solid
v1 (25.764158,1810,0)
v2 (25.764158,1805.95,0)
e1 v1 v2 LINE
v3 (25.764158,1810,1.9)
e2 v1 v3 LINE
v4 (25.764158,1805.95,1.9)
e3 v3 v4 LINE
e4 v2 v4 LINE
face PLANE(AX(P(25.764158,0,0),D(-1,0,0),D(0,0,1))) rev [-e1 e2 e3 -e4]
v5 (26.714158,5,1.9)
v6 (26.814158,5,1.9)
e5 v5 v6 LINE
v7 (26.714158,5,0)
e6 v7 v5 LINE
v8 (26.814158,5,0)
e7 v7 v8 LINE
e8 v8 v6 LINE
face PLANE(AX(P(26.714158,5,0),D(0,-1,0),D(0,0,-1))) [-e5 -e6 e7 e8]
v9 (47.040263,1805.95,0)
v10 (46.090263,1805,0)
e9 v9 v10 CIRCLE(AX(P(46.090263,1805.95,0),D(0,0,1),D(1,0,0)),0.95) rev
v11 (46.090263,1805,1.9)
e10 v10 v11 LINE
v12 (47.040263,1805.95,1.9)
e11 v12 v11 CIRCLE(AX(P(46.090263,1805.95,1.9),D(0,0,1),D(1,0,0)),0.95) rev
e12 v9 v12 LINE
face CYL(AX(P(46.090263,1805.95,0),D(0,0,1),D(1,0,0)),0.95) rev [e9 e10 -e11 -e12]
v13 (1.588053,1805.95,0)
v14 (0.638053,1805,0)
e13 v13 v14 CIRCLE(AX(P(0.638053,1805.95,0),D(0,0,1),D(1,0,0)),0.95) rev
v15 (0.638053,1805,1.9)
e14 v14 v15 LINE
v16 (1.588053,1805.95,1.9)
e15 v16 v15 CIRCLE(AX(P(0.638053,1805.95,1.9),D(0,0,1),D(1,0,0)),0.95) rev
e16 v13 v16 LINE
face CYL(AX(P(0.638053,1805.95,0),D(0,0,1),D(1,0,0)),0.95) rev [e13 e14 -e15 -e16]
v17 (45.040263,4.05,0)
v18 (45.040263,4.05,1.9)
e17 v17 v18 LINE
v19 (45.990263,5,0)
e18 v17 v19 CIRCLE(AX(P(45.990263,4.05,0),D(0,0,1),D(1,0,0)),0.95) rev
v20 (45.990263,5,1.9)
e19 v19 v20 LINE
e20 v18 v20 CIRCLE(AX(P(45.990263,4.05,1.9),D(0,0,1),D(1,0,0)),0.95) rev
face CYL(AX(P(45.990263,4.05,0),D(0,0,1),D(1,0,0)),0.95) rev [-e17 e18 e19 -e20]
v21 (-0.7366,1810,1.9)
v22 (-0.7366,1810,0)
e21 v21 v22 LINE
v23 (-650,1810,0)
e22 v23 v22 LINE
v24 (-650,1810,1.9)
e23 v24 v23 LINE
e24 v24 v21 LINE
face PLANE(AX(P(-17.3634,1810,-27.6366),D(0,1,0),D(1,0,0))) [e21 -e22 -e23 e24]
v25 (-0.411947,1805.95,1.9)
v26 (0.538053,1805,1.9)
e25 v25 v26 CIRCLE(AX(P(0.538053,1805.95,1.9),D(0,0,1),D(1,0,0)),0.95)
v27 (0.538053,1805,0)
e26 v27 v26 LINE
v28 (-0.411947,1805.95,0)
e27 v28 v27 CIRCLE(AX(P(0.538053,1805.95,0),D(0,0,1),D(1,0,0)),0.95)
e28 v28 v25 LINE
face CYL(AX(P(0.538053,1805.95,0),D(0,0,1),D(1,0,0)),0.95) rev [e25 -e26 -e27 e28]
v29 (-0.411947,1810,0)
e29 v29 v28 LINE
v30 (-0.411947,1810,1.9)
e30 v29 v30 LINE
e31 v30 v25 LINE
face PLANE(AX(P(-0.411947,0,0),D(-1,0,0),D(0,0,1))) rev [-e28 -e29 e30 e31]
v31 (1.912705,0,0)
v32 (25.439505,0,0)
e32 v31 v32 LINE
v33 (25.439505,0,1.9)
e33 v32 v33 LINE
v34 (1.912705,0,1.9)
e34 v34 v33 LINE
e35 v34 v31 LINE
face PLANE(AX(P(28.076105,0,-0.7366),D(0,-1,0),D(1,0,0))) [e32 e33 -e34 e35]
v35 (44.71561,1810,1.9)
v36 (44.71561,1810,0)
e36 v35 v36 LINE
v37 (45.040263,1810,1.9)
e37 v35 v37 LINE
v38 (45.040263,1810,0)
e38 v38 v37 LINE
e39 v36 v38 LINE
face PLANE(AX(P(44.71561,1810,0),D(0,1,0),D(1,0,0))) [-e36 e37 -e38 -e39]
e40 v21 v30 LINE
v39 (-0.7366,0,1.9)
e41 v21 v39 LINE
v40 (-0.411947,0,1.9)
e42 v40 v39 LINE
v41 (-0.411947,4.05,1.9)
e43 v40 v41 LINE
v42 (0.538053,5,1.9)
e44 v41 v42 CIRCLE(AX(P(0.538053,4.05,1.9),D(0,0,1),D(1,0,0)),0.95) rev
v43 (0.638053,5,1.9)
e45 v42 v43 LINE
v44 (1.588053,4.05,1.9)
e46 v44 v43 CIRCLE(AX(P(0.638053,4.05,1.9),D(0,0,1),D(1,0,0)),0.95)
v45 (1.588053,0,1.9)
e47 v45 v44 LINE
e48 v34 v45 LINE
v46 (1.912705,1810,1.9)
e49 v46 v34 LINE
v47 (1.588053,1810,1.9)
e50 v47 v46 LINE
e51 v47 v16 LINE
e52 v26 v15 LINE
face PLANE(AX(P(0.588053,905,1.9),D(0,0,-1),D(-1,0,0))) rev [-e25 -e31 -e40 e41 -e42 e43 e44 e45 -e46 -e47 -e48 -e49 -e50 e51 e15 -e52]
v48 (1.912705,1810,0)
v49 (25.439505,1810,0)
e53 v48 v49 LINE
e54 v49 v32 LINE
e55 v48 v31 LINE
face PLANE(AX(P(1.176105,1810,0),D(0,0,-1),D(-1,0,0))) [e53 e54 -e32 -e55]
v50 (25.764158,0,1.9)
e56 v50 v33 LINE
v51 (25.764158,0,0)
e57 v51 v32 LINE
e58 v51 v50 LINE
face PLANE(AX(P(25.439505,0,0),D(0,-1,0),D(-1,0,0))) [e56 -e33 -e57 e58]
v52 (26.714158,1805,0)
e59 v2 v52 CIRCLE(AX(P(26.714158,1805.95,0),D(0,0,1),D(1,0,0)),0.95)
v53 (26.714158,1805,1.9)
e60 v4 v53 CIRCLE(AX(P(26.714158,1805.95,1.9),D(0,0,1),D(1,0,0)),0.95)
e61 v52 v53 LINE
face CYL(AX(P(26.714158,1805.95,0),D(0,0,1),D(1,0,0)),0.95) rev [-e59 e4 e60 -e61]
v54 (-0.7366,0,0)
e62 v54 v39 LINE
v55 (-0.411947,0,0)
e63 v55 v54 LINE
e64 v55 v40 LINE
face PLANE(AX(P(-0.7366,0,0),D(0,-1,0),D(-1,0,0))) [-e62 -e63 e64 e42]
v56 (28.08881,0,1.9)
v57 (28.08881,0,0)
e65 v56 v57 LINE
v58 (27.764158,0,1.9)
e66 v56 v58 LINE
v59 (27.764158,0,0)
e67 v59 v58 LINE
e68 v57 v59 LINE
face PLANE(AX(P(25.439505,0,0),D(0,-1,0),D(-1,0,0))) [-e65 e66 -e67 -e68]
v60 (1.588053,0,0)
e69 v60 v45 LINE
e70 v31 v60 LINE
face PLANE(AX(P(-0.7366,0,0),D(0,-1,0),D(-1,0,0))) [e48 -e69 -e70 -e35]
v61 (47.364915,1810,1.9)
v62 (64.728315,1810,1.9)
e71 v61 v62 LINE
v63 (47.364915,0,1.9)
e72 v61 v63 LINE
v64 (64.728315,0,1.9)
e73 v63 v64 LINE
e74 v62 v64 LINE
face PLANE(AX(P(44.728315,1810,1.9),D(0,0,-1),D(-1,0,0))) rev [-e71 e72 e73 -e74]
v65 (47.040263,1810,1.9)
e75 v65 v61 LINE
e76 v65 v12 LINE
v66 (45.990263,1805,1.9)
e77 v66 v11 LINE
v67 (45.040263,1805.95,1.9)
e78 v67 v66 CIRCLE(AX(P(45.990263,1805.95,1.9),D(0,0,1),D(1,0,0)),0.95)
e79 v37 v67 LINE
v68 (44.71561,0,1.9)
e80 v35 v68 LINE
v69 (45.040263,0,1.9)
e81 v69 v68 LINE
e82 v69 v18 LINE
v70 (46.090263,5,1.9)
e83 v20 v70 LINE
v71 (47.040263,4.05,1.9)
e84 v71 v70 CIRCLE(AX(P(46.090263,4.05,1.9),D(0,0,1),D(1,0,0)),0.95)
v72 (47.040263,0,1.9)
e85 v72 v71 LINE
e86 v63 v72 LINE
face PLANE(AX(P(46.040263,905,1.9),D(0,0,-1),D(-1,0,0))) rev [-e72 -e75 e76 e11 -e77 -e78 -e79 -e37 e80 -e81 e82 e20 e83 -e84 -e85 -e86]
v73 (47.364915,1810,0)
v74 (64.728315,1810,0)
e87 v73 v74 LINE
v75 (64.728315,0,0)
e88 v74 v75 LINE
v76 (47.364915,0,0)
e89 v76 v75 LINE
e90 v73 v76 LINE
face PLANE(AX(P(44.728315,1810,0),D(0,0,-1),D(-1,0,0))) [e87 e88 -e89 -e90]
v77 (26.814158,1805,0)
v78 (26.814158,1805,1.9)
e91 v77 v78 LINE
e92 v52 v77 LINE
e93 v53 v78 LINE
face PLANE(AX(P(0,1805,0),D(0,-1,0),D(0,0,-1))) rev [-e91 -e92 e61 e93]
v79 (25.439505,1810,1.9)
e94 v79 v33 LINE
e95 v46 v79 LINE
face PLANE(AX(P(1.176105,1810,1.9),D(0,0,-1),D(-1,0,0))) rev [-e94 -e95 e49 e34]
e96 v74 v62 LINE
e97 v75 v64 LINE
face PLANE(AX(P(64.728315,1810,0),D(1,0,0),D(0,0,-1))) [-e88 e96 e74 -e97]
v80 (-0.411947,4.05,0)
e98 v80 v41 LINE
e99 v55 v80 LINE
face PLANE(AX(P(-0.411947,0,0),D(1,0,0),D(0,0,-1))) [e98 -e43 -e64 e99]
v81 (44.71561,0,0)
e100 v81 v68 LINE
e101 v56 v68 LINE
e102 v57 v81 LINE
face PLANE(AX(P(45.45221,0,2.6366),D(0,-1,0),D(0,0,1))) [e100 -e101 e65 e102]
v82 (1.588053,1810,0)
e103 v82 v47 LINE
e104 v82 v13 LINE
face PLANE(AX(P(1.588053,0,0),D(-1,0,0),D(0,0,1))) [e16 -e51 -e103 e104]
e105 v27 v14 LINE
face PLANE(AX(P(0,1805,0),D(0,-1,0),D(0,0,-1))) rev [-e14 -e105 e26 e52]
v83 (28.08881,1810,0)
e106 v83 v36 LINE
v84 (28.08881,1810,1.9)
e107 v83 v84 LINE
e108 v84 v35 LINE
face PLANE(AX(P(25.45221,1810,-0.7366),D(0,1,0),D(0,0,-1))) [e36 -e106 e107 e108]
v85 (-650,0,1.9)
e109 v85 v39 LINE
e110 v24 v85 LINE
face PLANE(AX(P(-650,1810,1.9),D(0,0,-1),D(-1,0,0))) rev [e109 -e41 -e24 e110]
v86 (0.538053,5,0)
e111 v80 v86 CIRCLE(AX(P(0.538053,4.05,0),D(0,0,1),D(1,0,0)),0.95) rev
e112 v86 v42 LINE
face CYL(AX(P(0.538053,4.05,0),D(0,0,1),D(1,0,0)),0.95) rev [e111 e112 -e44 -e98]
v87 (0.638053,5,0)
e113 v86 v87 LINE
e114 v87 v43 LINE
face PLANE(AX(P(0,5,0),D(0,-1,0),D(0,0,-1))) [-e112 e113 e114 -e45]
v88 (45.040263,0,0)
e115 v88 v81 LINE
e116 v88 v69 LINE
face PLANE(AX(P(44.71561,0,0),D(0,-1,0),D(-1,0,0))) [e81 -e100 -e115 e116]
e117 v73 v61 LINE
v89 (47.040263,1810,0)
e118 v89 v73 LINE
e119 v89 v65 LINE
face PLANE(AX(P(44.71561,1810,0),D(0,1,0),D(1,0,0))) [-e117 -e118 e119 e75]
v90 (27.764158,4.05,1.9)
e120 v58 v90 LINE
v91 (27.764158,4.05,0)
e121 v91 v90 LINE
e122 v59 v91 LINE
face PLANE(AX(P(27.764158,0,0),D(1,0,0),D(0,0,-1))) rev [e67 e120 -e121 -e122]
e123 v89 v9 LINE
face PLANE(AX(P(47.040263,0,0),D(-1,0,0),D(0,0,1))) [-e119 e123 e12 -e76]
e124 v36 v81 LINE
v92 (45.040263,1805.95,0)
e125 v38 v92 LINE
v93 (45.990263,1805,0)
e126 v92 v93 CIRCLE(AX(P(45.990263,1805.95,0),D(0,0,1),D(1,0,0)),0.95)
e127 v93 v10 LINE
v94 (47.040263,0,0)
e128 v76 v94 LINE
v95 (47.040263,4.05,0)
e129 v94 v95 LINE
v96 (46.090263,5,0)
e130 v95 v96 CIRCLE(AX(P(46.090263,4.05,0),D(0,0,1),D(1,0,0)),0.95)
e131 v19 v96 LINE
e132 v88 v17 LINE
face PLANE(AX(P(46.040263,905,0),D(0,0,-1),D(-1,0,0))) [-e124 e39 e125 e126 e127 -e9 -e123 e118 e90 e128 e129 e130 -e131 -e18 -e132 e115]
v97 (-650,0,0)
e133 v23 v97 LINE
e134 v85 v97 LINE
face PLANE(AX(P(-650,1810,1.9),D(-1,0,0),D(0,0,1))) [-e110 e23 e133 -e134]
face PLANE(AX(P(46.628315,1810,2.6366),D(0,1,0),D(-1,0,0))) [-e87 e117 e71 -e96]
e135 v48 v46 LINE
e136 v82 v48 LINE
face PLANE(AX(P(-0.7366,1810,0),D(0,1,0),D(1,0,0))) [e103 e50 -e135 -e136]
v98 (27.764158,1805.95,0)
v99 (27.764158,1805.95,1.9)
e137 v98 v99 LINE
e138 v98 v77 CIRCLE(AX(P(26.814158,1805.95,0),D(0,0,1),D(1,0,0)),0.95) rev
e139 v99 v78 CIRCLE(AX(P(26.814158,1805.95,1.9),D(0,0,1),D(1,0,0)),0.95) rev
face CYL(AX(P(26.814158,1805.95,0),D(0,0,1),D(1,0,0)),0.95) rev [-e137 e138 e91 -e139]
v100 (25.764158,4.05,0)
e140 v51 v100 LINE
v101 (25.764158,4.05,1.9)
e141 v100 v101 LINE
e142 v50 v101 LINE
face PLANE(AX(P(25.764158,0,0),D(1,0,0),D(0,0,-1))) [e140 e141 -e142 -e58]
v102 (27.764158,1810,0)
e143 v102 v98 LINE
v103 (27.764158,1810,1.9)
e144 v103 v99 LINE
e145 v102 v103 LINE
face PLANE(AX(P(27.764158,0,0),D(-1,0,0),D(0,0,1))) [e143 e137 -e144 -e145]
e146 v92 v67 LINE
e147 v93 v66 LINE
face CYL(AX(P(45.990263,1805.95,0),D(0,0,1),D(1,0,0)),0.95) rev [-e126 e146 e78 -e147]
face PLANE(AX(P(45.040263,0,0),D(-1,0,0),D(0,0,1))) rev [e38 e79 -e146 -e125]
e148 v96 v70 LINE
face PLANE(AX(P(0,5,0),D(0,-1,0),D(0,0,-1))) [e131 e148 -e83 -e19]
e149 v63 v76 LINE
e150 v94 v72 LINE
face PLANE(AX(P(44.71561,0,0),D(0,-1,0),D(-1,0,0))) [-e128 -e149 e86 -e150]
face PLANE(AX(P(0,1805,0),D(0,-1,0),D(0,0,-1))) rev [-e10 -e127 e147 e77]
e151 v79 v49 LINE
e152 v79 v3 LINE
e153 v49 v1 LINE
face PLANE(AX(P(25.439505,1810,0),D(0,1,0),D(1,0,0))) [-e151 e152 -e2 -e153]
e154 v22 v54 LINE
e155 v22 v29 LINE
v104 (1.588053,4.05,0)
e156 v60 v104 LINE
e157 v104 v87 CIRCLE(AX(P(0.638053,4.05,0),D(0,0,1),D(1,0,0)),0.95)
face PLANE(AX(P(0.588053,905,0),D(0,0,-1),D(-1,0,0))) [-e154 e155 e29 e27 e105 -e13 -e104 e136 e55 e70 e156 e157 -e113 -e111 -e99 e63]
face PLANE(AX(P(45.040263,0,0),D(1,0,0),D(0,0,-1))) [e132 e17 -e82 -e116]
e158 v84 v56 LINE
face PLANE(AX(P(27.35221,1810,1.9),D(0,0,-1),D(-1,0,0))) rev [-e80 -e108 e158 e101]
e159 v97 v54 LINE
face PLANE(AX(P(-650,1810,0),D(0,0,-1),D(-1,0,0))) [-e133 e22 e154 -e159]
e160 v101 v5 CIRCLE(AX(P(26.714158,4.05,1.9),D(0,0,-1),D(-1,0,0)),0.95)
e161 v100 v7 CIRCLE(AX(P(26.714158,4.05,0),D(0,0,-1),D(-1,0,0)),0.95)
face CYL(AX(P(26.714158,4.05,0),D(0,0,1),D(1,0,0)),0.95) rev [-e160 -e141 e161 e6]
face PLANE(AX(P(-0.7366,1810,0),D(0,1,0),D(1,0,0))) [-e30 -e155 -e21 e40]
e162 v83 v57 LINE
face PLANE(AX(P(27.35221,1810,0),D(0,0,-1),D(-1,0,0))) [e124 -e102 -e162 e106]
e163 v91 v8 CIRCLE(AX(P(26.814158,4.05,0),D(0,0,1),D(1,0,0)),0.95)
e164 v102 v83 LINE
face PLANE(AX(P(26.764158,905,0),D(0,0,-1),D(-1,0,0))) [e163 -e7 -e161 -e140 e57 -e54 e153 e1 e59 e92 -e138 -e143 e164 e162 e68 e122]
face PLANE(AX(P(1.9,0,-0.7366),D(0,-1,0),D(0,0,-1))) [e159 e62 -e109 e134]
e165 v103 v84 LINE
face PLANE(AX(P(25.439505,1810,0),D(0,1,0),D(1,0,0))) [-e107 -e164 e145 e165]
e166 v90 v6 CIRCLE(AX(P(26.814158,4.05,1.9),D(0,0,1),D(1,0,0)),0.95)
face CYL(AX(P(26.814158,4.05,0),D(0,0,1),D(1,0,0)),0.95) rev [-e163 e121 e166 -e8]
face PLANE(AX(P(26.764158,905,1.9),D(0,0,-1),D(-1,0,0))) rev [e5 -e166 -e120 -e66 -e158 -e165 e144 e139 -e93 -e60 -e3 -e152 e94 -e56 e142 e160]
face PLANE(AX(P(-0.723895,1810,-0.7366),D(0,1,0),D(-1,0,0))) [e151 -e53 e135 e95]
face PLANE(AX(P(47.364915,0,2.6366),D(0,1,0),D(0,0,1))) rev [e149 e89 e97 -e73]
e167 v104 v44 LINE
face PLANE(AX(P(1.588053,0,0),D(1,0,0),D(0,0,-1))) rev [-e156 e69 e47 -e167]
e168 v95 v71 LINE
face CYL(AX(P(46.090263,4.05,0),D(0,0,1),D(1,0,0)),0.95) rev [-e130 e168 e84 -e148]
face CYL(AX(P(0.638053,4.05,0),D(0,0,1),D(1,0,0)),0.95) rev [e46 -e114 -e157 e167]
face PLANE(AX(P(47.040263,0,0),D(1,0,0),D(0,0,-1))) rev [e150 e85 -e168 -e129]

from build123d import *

# Parameters (mm, degrees)
BRIDA_BASE2_DEPTH          = 1810
DESDOBLAR1_DEPTH           = 1810
DESDOBLAR1_2_DEPTH         = 1810
CORTAR_EXTRUIR2_DEPTH      = 1924.175397617
CORTAR_EXTRUIR2_DEPTH_BACK = 1924.175397617


# Read off the part's stored shape, not the designer's step: Desdoblar1
# Sheet-metal steps are written as plain solids
with BuildPart() as part:
    # Croquis4 → Brida base2 (new body)
    with BuildSketch(Plane(origin=(0, 0, 0), x_dir=(1, 0, 0), z_dir=(0, 1, 0))):
        with BuildLine():
            Line((-650, 0), (-0.7366, 0))
            ThreePointArc((-0.7366, 0), (-0.215745145, 0.215745145), (0, 0.7366))
            Line((0, 0.7366), (0, 24.2634))
            ThreePointArc((0, 24.2634), (-0.215745145, 24.784254855), (-0.7366, 25))
            Line((-0.7366, 25), (-17.3634, 25))
            ThreePointArc((-17.3634, 25), (-19.227757739, 25.772242261), (-20, 27.6366))
            Line((-20, 27.6366), (-20, 45))
            Line((-20, 45), (-18.1, 45))
            Line((-18.1, 45), (-18.1, 27.6366))
            ThreePointArc((-18.1, 27.6366), (-17.884254855, 27.115745145), (-17.3634, 26.9))
            Line((-17.3634, 26.9), (-0.7366, 26.9))
            ThreePointArc((-0.7366, 26.9), (1.127757739, 26.127757739), (1.9, 24.2634))
            Line((1.9, 24.2634), (1.9, 0.7366))
            ThreePointArc((1.9, 0.7366), (1.127757739, -1.127757739), (-0.7366, -1.9))
            Line((-0.7366, -1.9), (-650, -1.9))
            Line((-650, -1.9), (-650, 0))
        make_face()
    extrude(amount=BRIDA_BASE2_DEPTH)

    # Desdoblar1 outline → Desdoblar1 (cut)
    with BuildSketch(Plane(origin=(0, 0, 0), x_dir=(1, 0, 0), z_dir=(0, 1, 0))):
        with BuildLine():
            Line((-0.7366, 0), (1.795016084, 0))
            ThreePointArc((1.795016084, 0), (1.873622072, 0.364578098), (1.9, 0.7366))
            Line((1.9, 0.7366), (1.9, 24.2634))
            ThreePointArc((1.9, 24.2634), (1.127757739, 26.127757739), (-0.7366, 26.9))
            Line((-0.7366, 26.9), (-17.3634, 26.9))
            ThreePointArc((-17.3634, 26.9), (-17.884254855, 27.115745145), (-18.1, 27.6366))
            Line((-18.1, 27.6366), (-18.1, 45))
            Line((-18.1, 45), (-20, 45))
            Line((-20, 45), (-20, 27.6366))
            ThreePointArc((-20, 27.6366), (-19.227757739, 25.772242261), (-17.3634, 25))
            Line((-17.3634, 25), (-0.7366, 25))
            ThreePointArc((-0.7366, 25), (-0.215745145, 24.784254855), (0, 24.2634))
            Line((0, 24.2634), (0, 0.7366))
            ThreePointArc((0, 0.7366), (-0.215745145, 0.215745145), (-0.7366, 0))
        make_face()
    extrude(amount=DESDOBLAR1_DEPTH, mode=Mode.SUBTRACT)

    # Desdoblar1 2 outline → Desdoblar1 2 (add)
    with BuildSketch(Plane(origin=(0, 0, 0), x_dir=(1, 0, 0), z_dir=(0, 1, 0))):
        with BuildLine():
            Line((64.728315254, 0), (1.795016084, 0))
            ThreePointArc((1.795016084, 0), (0.846046517, -1.372164937), (-0.7366, -1.9))
            Line((-0.7366, -1.9), (64.728315254, -1.9))
            Line((64.728315254, -1.9), (64.728315254, 0))
        make_face()
    extrude(amount=DESDOBLAR1_2_DEPTH)

    # Croquis15 → Cortar-Extruir2 (cut, two sides: drawn at the far end of the back side and taken through both)
    with BuildSketch(Plane.XY.offset(1.9).offset(-CORTAR_EXTRUIR2_DEPTH_BACK)):
        with BuildLine():
            Line((-0.411947458, 0), (1.588052542, 0))
            Line((1.588052542, 0), (1.588052542, 4.05))
            ThreePointArc((1.588052542, 4.05), (1.309803985, 4.721751442), (0.638052542, 5))
            Line((0.638052542, 5), (0.538052542, 5))
            ThreePointArc((0.538052542, 5), (-0.1336989, 4.721751442), (-0.411947458, 4.05))
            Line((-0.411947458, 4.05), (-0.411947458, 0))
        make_face()
        with BuildLine():
            Line((45.040262712, 0), (47.040262712, 0))
            Line((47.040262712, 0), (47.040262712, 4.05))
            ThreePointArc((47.040262712, 4.05), (46.762014154, 4.721751442), (46.090262712, 5))
            Line((46.090262712, 5), (45.990262712, 5))
            ThreePointArc((45.990262712, 5), (45.31851127, 4.721751442), (45.040262712, 4.05))
            Line((45.040262712, 4.05), (45.040262712, 0))
        make_face()
        with BuildLine():
            Line((45.040262712, 1810), (45.040262712, 1805.95))
            ThreePointArc((45.040262712, 1805.95), (45.31851127, 1805.278248558), (45.990262712, 1805))
            Line((45.990262712, 1805), (46.090262712, 1805))
            ThreePointArc((46.090262712, 1805), (46.762014154, 1805.278248558), (47.040262712, 1805.95))
            Line((47.040262712, 1805.95), (47.040262712, 1810))
            Line((47.040262712, 1810), (45.040262712, 1810))
        make_face()
        with BuildLine():
            Line((25.764157627, 1810), (25.764157627, 1805.95))
            ThreePointArc((25.764157627, 1805.95), (26.042406185, 1805.278248558), (26.714157627, 1805))
            Line((26.714157627, 1805), (26.814157627, 1805))
            ThreePointArc((26.814157627, 1805), (27.485909069, 1805.278248558), (27.764157627, 1805.95))
            Line((27.764157627, 1805.95), (27.764157627, 1810))
            Line((27.764157627, 1810), (25.764157627, 1810))
        make_face()
        with BuildLine():
            Line((1.588052542, 1805.95), (1.588052542, 1810))
            Line((1.588052542, 1810), (-0.411947458, 1810))
            Line((-0.411947458, 1810), (-0.411947458, 1805.95))
            ThreePointArc((-0.411947458, 1805.95), (-0.1336989, 1805.278248558), (0.538052542, 1805))
            Line((0.538052542, 1805), (0.638052542, 1805))
            ThreePointArc((0.638052542, 1805), (1.309803985, 1805.278248558), (1.588052542, 1805.95))
        make_face()
        with BuildLine():
            Line((27.764157627, 0), (27.764157627, 4.05))
            ThreePointArc((27.764157627, 4.05), (27.485909069, 4.721751442), (26.814157627, 5))
            Line((26.814157627, 5), (26.714157627, 5))
            ThreePointArc((26.714157627, 5), (26.042406185, 4.721751442), (25.764157627, 4.05))
            Line((25.764157627, 4.05), (25.764157627, 0))
            Line((25.764157627, 0), (27.764157627, 0))
        make_face()
    extrude(amount=CORTAR_EXTRUIR2_DEPTH + CORTAR_EXTRUIR2_DEPTH_BACK, mode=Mode.SUBTRACT)


solid = part.part
